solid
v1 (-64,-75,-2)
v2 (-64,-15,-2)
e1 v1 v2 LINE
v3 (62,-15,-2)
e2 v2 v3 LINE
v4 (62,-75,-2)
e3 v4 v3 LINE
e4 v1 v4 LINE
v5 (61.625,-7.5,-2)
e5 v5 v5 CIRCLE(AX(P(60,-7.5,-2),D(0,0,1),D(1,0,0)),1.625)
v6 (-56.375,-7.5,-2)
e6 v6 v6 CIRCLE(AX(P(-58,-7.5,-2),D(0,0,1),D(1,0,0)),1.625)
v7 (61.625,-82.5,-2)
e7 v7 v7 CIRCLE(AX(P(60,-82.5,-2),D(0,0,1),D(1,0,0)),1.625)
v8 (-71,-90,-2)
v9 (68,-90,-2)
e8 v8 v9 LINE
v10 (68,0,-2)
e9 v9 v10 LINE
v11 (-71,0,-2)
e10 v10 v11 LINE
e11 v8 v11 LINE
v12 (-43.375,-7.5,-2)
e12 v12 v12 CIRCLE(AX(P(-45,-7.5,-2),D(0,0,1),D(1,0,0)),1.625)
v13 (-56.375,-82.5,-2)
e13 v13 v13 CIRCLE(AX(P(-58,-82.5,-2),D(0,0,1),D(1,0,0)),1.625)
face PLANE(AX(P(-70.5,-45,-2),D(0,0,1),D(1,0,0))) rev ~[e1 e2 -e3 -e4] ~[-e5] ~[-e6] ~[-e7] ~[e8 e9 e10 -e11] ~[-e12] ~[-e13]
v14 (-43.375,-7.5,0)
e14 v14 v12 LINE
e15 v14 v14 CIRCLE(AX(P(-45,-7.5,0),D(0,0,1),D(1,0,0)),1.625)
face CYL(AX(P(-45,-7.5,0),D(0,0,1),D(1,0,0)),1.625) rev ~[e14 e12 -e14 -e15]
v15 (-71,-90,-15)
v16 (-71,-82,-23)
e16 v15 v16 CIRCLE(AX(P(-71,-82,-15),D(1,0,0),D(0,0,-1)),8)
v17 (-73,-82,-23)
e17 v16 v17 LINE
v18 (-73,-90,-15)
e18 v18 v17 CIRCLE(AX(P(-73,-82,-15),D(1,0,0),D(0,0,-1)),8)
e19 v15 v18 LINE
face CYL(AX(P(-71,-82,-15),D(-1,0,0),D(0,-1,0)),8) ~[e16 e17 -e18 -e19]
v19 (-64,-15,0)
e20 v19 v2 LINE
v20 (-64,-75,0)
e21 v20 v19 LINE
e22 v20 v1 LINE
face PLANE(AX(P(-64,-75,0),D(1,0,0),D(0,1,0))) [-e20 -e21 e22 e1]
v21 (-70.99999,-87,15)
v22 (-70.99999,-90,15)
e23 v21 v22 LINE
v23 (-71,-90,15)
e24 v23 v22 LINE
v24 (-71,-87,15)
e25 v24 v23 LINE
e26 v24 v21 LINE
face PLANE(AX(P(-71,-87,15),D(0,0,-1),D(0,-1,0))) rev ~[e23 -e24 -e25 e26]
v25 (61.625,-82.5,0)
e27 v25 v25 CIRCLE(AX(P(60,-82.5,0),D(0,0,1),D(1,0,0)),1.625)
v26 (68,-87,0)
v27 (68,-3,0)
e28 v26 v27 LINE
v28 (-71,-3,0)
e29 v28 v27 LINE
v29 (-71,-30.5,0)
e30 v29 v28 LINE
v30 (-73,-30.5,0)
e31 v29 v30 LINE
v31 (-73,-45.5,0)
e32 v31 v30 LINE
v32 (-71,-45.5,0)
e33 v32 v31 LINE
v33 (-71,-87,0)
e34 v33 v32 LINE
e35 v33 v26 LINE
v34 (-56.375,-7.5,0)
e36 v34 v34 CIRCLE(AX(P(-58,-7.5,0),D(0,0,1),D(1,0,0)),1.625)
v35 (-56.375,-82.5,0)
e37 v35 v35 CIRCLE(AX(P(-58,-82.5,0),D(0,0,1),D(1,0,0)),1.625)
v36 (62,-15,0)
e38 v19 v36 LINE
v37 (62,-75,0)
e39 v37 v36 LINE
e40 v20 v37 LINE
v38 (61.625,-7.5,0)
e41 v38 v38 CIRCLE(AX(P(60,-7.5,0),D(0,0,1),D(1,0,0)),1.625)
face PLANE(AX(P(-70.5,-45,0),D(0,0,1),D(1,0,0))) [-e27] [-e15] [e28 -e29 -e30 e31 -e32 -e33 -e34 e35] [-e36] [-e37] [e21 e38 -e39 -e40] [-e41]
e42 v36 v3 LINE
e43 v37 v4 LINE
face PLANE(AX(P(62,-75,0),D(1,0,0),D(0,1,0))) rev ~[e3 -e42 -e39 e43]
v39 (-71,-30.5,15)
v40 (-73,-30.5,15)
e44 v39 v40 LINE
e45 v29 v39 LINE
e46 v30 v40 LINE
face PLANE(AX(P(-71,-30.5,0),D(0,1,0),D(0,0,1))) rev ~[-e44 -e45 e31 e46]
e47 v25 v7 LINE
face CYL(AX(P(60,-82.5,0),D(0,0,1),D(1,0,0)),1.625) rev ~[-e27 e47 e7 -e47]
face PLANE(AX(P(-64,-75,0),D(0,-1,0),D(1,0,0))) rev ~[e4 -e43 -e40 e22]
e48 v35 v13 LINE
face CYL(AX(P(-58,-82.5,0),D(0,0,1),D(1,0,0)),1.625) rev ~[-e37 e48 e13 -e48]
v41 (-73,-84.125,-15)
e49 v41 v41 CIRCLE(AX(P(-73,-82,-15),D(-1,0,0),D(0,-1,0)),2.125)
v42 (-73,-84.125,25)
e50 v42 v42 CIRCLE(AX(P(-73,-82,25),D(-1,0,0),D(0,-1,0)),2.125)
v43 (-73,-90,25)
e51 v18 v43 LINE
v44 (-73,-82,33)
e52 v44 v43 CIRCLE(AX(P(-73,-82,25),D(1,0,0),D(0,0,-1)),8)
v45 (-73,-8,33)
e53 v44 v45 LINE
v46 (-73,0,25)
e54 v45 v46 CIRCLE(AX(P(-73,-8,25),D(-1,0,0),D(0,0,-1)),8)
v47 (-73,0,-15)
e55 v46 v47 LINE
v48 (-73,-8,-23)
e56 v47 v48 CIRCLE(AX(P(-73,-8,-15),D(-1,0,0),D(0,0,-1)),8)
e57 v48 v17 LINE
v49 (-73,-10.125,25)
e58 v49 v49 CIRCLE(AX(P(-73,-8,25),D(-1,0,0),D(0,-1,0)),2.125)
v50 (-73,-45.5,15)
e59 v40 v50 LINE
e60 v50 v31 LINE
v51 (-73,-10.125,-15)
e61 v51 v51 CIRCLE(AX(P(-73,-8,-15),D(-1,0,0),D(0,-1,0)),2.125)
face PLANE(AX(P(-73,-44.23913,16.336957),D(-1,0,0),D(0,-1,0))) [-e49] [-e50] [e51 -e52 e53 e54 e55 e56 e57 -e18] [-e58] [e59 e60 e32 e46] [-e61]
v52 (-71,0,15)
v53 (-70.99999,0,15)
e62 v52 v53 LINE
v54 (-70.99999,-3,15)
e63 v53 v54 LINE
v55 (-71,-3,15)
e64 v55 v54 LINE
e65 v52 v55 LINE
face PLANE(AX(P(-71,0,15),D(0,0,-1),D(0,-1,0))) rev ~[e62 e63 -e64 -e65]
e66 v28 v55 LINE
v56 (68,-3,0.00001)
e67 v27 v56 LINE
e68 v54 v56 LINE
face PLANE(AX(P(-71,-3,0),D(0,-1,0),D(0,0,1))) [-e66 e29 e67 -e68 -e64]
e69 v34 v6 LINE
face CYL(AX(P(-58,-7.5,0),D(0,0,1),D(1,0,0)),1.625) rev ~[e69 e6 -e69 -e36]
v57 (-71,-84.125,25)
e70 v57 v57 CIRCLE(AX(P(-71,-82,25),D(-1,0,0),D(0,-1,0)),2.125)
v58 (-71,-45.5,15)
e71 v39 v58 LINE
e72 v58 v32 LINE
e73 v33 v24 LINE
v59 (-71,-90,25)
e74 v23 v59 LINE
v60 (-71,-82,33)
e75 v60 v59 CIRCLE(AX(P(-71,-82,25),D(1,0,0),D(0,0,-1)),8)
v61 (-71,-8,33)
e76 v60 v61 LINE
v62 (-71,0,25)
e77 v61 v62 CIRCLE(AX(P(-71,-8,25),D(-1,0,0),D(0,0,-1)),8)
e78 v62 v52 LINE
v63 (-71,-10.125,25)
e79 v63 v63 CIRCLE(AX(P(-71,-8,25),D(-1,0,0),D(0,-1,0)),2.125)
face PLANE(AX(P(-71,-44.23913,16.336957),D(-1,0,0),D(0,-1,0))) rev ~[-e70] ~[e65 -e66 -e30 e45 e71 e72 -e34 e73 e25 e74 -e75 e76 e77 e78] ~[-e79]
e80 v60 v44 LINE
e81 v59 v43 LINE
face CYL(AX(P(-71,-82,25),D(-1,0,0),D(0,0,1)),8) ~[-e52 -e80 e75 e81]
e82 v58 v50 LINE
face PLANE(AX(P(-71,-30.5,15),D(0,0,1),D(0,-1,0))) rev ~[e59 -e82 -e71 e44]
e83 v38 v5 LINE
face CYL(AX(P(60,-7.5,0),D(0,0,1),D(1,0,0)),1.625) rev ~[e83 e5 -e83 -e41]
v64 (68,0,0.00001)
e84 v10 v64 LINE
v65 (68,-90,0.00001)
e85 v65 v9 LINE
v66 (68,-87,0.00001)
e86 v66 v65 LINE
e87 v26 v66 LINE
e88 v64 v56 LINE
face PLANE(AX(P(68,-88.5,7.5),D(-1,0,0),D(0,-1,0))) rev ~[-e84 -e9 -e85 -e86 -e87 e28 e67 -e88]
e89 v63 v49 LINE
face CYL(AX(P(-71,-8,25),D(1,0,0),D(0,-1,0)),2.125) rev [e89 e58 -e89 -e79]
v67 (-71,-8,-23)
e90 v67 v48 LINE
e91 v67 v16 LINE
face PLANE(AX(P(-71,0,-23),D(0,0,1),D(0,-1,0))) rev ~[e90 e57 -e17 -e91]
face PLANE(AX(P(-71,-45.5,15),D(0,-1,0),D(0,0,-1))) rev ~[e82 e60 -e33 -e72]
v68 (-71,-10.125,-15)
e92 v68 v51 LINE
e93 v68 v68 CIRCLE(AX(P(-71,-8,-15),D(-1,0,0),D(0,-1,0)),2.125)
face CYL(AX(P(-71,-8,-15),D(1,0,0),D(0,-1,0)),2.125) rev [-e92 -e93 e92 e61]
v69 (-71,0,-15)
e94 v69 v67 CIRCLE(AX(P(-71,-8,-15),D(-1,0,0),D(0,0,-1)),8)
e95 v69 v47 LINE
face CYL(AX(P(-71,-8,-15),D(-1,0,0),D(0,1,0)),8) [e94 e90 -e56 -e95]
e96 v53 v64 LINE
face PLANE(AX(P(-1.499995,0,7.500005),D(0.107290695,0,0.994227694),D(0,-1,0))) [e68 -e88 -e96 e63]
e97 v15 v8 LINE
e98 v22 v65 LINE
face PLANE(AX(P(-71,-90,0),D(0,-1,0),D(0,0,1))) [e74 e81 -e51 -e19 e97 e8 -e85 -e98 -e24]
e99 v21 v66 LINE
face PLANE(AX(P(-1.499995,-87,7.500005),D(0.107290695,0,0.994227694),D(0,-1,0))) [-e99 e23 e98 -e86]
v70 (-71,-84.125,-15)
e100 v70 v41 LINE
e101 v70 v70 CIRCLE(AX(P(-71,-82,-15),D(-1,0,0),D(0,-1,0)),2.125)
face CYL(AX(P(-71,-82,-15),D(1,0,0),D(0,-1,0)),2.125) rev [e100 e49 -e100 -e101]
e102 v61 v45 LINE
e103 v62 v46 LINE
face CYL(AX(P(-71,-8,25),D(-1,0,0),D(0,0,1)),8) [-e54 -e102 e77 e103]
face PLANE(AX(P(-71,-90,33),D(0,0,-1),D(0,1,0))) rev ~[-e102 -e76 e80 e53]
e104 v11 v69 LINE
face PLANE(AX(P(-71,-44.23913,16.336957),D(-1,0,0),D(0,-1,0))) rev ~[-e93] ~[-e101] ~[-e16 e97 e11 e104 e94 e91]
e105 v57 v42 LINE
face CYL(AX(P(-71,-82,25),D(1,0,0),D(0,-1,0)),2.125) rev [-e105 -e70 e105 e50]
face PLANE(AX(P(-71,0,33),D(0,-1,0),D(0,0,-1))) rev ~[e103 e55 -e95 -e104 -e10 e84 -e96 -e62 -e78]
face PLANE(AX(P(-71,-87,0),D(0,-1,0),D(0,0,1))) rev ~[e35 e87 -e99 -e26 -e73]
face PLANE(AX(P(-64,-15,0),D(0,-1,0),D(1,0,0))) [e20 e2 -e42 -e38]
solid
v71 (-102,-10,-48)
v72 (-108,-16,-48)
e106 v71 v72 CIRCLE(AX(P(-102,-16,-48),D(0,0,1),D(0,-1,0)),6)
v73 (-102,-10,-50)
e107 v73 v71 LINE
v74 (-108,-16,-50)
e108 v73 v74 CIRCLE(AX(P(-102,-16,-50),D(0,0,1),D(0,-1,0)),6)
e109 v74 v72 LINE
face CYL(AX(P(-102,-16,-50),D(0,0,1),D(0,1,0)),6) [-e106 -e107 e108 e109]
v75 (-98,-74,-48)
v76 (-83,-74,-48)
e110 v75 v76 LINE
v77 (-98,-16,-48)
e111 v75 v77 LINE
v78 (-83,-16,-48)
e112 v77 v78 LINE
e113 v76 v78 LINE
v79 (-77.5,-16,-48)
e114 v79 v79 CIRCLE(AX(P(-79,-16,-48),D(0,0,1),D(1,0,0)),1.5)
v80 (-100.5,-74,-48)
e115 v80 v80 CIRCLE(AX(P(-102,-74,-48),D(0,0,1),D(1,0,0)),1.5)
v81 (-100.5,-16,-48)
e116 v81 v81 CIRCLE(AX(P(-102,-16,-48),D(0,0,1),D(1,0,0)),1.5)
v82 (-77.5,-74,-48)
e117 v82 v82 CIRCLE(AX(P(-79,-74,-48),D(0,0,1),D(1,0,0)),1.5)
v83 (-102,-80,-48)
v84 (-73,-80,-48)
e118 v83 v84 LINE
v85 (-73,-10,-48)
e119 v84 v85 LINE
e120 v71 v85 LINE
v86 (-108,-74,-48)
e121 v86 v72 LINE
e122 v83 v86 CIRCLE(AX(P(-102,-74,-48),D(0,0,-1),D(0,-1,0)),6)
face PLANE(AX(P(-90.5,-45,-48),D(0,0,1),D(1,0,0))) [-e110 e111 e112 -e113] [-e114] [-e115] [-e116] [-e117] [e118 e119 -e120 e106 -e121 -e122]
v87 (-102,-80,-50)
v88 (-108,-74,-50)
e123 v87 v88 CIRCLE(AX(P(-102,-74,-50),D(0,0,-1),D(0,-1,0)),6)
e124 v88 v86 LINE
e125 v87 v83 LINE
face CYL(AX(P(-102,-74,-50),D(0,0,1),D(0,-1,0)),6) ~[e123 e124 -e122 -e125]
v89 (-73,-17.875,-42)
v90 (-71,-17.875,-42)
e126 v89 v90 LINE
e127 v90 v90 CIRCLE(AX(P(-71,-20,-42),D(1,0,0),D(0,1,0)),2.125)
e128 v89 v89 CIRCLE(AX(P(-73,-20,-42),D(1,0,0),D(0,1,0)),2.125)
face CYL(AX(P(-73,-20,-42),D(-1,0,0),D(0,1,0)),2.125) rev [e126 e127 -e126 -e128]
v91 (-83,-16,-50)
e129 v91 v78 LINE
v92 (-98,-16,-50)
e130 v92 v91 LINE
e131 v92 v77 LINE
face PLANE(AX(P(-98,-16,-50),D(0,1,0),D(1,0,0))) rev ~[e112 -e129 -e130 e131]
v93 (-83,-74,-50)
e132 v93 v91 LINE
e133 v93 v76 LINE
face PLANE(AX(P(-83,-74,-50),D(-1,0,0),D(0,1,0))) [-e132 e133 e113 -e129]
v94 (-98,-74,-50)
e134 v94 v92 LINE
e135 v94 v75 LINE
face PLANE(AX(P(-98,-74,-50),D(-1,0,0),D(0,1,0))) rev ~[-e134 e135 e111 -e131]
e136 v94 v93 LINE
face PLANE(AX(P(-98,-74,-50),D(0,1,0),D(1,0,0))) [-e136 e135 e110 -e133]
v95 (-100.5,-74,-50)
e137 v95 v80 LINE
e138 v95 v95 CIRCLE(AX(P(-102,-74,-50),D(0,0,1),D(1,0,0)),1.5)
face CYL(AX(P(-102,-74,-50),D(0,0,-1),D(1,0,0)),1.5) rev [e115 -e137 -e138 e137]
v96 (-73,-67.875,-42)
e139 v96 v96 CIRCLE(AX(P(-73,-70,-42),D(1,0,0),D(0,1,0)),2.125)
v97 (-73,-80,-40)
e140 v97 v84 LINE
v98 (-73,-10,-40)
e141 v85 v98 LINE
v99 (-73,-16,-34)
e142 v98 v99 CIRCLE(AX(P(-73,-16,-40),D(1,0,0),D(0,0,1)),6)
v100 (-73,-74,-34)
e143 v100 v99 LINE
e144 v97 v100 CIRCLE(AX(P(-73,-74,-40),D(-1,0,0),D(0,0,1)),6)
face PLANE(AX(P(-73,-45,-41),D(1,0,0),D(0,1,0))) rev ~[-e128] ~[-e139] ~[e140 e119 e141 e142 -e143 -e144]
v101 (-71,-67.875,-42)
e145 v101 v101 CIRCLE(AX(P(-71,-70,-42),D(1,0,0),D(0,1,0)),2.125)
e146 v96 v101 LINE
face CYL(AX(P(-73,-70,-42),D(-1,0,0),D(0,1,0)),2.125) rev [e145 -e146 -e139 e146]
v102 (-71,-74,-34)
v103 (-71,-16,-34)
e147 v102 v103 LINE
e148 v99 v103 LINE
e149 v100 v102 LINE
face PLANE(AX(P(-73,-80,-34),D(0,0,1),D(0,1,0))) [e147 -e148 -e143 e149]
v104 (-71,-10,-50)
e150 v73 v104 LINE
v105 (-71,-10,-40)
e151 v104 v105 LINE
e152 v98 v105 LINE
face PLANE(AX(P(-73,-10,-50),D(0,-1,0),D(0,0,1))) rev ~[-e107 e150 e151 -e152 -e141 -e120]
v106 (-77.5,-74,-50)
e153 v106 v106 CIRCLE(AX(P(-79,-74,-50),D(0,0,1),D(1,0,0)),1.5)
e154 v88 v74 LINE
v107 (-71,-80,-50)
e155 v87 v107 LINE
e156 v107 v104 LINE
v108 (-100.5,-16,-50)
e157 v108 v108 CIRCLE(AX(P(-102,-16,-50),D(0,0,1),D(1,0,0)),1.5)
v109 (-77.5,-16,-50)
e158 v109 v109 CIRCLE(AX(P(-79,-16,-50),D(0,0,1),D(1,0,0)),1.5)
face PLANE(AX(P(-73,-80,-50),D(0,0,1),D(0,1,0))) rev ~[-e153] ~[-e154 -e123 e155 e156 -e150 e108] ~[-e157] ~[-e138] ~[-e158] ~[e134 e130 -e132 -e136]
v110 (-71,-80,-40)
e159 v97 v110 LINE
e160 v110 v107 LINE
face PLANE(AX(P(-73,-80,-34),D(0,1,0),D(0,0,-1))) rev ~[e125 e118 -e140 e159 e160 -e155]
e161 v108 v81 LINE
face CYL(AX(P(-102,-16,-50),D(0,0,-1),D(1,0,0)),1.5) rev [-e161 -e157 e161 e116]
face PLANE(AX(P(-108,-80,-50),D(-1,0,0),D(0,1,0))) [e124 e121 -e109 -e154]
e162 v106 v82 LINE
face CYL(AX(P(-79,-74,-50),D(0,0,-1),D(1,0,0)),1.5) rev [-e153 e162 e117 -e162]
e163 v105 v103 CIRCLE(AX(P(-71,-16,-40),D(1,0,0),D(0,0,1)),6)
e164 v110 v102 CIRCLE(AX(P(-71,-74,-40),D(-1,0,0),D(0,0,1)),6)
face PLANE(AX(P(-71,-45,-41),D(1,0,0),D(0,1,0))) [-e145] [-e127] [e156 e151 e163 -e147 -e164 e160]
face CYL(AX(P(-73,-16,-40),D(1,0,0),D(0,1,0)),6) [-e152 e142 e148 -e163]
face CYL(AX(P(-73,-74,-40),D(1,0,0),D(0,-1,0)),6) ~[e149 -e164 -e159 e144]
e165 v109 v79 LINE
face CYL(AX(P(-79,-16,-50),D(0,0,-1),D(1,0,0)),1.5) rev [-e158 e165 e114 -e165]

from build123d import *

# Parameters (mm, degrees)
F0_W       = 1
F0_H       = 90
F0_R       = 1.625
F0_W_2     = 126
F0_H_2     = 60
F1_DEPTH   = 2
F2_R       = 2.125
F2_W       = 90
F2_H       = 21
F3_DEPTH   = 2
F4_R       = 8
F5_W       = 3
F5_H       = 15
F6_DEPTH   = 139
F7_SIZE2   = 14.99999
F7_SIZE    = 138.99999
F7_2_SIZE2 = 14.99999
F7_2_SIZE  = 138.99999
F9_W       = 35
F9_H       = 70
F9_R       = 1.5
F9_W_2     = 15
F9_H_2     = 58
F10_DEPTH  = 2
F11_W      = 70
F11_H      = 14
F11_R      = 2.125
F11_H_2    = 2
F12_DEPTH  = 2
F13_R      = 6


# Not quite as in the source:
# - a fillet or chamfer is up to 0.001 mm smaller than in the source, because OpenCascade refuses the exact size
# - a feature names something its author has since deleted; it is built from what else it names


with BuildPart() as f1:
    # F0 (on Top) → F1 (new body)
    with BuildSketch(Plane.XY):
        with Locations((-70.5, -45)):
            Rectangle(F0_W, F0_H)
        Polygon((0, 0), (-70, 0), (-70, -90), (68, -90), (68, 0), align=None)
        with Locations((-58, -82.5)):
            Circle(F0_R, mode=Mode.SUBTRACT)
        with Locations((60, -82.5)):
            Circle(F0_R, mode=Mode.SUBTRACT)
        with Locations((-1, -45)):
            Rectangle(F0_W_2, F0_H_2, mode=Mode.SUBTRACT)
        with Locations((-58, -7.5)):
            Circle(F0_R, mode=Mode.SUBTRACT)
        with Locations((-45, -7.5)):
            Circle(F0_R, mode=Mode.SUBTRACT)
        with Locations((60, -7.5)):
            Circle(F0_R, mode=Mode.SUBTRACT)
    extrude(amount=-F1_DEPTH)

    # F2 (on face) → F3 (join)
    with BuildSketch(Plane(origin=(-71, 0, 0), x_dir=(0, -1, 0), z_dir=(-1, 0, 0))):
        Polygon((90, 33), (0, 33), (0, 0), (30.5, 0), (30.5, 15), (45.5, 15), (45.5, 0), (90, 0), align=None)
        with Locations((8, 25)):
            Circle(F2_R, mode=Mode.SUBTRACT)
        with Locations((82, 25)):
            Circle(F2_R, mode=Mode.SUBTRACT)
        with Locations((45, -12.5)):
            Rectangle(F2_W, F2_H)
        with Locations((8, -15)):
            Circle(F2_R, mode=Mode.SUBTRACT)
        with Locations((82, -15)):
            Circle(F2_R, mode=Mode.SUBTRACT)
        Polygon((30.5, 0), (0, 0), (0, -2), (90, -2), (90, 0), (45.5, 0), align=None)
    extrude(amount=F3_DEPTH)

    # F4
    f4_edges = [f1.edges().sort_by_distance(p)[0] for p in [
        (-72, -90, 33),
        (-72, -90, -23),
        (-72, 0, -23),
        (-72, 0, 33),
    ]]
    fillet(f4_edges, radius=F4_R)

    # F5 (on face) → F6 (join)
    with BuildSketch(Plane(origin=(-71, 0, 0), x_dir=(0, -1, 0), z_dir=(-1, 0, 0))):
        with Locations((88.5, 7.5)):
            Rectangle(F5_W, F5_H)
        with Locations((1.5, 7.5)):
            Rectangle(F5_W, F5_H)
    extrude(amount=-F6_DEPTH)

    # F7 (size 139 and 15 in the source; OpenCascade refuses exactly that, so slightly less here)
    f7_edges = [f1.edges().sort_by_distance(p)[0] for p in [
        (68, -88.5, 15),
    ]]
    f7_side = f1.faces().sort_by_distance((-1.5, -88.5, 15))[0]
    chamfer(f7_edges, length=F7_SIZE, length2=F7_SIZE2, reference=f7_side)

    # F7#2 (size 139 and 15 in the source; OpenCascade refuses exactly that, so slightly less here)
    f7_2_edges = [f1.edges().sort_by_distance(p)[0] for p in [
        (68, -1.5, 15),
    ]]
    f7_2_side = f1.faces().sort_by_distance((-1.5, -1.5, 15))[0]
    chamfer(f7_2_edges, length=F7_2_SIZE, length2=F7_2_SIZE2, reference=f7_2_side)


with BuildPart() as f10:
    # F9 (on offset) → F10 (new body)
    with BuildSketch(Plane.XY.offset(-50)):
        with Locations((-90.5, -45)):
            Rectangle(F9_W, F9_H)
        with Locations((-102, -74)):
            Circle(F9_R, mode=Mode.SUBTRACT)
        with Locations((-79, -74)):
            Circle(F9_R, mode=Mode.SUBTRACT)
        with Locations((-102, -16)):
            Circle(F9_R, mode=Mode.SUBTRACT)
        with Locations((-90.5, -45)):
            Rectangle(F9_W_2, F9_H_2, mode=Mode.SUBTRACT)
        with Locations((-79, -16)):
            Circle(F9_R, mode=Mode.SUBTRACT)
    extrude(amount=F10_DEPTH)

    # F11 (on face) → F12 (join)
    with BuildSketch(Plane.YZ.offset(-73)):
        with Locations((-45, -41)):
            Rectangle(F11_W, F11_H)
        with Locations((-70, -42)):
            Circle(F11_R, mode=Mode.SUBTRACT)
        with Locations((-20, -42)):
            Circle(F11_R, mode=Mode.SUBTRACT)
        with Locations((-45, -49)):
            Rectangle(F11_W, F11_H_2)
    extrude(amount=F12_DEPTH)

    # F13
    f13_edges = [f10.edges().sort_by_distance(p)[0] for p in [
        (-108, -10, -49),
        (-108, -80, -49),
        (-72, -80, -34),
        (-72, -10, -34),
    ]]
    fillet(f13_edges, radius=F13_R)


solid = Compound([f1.part, f10.part])
